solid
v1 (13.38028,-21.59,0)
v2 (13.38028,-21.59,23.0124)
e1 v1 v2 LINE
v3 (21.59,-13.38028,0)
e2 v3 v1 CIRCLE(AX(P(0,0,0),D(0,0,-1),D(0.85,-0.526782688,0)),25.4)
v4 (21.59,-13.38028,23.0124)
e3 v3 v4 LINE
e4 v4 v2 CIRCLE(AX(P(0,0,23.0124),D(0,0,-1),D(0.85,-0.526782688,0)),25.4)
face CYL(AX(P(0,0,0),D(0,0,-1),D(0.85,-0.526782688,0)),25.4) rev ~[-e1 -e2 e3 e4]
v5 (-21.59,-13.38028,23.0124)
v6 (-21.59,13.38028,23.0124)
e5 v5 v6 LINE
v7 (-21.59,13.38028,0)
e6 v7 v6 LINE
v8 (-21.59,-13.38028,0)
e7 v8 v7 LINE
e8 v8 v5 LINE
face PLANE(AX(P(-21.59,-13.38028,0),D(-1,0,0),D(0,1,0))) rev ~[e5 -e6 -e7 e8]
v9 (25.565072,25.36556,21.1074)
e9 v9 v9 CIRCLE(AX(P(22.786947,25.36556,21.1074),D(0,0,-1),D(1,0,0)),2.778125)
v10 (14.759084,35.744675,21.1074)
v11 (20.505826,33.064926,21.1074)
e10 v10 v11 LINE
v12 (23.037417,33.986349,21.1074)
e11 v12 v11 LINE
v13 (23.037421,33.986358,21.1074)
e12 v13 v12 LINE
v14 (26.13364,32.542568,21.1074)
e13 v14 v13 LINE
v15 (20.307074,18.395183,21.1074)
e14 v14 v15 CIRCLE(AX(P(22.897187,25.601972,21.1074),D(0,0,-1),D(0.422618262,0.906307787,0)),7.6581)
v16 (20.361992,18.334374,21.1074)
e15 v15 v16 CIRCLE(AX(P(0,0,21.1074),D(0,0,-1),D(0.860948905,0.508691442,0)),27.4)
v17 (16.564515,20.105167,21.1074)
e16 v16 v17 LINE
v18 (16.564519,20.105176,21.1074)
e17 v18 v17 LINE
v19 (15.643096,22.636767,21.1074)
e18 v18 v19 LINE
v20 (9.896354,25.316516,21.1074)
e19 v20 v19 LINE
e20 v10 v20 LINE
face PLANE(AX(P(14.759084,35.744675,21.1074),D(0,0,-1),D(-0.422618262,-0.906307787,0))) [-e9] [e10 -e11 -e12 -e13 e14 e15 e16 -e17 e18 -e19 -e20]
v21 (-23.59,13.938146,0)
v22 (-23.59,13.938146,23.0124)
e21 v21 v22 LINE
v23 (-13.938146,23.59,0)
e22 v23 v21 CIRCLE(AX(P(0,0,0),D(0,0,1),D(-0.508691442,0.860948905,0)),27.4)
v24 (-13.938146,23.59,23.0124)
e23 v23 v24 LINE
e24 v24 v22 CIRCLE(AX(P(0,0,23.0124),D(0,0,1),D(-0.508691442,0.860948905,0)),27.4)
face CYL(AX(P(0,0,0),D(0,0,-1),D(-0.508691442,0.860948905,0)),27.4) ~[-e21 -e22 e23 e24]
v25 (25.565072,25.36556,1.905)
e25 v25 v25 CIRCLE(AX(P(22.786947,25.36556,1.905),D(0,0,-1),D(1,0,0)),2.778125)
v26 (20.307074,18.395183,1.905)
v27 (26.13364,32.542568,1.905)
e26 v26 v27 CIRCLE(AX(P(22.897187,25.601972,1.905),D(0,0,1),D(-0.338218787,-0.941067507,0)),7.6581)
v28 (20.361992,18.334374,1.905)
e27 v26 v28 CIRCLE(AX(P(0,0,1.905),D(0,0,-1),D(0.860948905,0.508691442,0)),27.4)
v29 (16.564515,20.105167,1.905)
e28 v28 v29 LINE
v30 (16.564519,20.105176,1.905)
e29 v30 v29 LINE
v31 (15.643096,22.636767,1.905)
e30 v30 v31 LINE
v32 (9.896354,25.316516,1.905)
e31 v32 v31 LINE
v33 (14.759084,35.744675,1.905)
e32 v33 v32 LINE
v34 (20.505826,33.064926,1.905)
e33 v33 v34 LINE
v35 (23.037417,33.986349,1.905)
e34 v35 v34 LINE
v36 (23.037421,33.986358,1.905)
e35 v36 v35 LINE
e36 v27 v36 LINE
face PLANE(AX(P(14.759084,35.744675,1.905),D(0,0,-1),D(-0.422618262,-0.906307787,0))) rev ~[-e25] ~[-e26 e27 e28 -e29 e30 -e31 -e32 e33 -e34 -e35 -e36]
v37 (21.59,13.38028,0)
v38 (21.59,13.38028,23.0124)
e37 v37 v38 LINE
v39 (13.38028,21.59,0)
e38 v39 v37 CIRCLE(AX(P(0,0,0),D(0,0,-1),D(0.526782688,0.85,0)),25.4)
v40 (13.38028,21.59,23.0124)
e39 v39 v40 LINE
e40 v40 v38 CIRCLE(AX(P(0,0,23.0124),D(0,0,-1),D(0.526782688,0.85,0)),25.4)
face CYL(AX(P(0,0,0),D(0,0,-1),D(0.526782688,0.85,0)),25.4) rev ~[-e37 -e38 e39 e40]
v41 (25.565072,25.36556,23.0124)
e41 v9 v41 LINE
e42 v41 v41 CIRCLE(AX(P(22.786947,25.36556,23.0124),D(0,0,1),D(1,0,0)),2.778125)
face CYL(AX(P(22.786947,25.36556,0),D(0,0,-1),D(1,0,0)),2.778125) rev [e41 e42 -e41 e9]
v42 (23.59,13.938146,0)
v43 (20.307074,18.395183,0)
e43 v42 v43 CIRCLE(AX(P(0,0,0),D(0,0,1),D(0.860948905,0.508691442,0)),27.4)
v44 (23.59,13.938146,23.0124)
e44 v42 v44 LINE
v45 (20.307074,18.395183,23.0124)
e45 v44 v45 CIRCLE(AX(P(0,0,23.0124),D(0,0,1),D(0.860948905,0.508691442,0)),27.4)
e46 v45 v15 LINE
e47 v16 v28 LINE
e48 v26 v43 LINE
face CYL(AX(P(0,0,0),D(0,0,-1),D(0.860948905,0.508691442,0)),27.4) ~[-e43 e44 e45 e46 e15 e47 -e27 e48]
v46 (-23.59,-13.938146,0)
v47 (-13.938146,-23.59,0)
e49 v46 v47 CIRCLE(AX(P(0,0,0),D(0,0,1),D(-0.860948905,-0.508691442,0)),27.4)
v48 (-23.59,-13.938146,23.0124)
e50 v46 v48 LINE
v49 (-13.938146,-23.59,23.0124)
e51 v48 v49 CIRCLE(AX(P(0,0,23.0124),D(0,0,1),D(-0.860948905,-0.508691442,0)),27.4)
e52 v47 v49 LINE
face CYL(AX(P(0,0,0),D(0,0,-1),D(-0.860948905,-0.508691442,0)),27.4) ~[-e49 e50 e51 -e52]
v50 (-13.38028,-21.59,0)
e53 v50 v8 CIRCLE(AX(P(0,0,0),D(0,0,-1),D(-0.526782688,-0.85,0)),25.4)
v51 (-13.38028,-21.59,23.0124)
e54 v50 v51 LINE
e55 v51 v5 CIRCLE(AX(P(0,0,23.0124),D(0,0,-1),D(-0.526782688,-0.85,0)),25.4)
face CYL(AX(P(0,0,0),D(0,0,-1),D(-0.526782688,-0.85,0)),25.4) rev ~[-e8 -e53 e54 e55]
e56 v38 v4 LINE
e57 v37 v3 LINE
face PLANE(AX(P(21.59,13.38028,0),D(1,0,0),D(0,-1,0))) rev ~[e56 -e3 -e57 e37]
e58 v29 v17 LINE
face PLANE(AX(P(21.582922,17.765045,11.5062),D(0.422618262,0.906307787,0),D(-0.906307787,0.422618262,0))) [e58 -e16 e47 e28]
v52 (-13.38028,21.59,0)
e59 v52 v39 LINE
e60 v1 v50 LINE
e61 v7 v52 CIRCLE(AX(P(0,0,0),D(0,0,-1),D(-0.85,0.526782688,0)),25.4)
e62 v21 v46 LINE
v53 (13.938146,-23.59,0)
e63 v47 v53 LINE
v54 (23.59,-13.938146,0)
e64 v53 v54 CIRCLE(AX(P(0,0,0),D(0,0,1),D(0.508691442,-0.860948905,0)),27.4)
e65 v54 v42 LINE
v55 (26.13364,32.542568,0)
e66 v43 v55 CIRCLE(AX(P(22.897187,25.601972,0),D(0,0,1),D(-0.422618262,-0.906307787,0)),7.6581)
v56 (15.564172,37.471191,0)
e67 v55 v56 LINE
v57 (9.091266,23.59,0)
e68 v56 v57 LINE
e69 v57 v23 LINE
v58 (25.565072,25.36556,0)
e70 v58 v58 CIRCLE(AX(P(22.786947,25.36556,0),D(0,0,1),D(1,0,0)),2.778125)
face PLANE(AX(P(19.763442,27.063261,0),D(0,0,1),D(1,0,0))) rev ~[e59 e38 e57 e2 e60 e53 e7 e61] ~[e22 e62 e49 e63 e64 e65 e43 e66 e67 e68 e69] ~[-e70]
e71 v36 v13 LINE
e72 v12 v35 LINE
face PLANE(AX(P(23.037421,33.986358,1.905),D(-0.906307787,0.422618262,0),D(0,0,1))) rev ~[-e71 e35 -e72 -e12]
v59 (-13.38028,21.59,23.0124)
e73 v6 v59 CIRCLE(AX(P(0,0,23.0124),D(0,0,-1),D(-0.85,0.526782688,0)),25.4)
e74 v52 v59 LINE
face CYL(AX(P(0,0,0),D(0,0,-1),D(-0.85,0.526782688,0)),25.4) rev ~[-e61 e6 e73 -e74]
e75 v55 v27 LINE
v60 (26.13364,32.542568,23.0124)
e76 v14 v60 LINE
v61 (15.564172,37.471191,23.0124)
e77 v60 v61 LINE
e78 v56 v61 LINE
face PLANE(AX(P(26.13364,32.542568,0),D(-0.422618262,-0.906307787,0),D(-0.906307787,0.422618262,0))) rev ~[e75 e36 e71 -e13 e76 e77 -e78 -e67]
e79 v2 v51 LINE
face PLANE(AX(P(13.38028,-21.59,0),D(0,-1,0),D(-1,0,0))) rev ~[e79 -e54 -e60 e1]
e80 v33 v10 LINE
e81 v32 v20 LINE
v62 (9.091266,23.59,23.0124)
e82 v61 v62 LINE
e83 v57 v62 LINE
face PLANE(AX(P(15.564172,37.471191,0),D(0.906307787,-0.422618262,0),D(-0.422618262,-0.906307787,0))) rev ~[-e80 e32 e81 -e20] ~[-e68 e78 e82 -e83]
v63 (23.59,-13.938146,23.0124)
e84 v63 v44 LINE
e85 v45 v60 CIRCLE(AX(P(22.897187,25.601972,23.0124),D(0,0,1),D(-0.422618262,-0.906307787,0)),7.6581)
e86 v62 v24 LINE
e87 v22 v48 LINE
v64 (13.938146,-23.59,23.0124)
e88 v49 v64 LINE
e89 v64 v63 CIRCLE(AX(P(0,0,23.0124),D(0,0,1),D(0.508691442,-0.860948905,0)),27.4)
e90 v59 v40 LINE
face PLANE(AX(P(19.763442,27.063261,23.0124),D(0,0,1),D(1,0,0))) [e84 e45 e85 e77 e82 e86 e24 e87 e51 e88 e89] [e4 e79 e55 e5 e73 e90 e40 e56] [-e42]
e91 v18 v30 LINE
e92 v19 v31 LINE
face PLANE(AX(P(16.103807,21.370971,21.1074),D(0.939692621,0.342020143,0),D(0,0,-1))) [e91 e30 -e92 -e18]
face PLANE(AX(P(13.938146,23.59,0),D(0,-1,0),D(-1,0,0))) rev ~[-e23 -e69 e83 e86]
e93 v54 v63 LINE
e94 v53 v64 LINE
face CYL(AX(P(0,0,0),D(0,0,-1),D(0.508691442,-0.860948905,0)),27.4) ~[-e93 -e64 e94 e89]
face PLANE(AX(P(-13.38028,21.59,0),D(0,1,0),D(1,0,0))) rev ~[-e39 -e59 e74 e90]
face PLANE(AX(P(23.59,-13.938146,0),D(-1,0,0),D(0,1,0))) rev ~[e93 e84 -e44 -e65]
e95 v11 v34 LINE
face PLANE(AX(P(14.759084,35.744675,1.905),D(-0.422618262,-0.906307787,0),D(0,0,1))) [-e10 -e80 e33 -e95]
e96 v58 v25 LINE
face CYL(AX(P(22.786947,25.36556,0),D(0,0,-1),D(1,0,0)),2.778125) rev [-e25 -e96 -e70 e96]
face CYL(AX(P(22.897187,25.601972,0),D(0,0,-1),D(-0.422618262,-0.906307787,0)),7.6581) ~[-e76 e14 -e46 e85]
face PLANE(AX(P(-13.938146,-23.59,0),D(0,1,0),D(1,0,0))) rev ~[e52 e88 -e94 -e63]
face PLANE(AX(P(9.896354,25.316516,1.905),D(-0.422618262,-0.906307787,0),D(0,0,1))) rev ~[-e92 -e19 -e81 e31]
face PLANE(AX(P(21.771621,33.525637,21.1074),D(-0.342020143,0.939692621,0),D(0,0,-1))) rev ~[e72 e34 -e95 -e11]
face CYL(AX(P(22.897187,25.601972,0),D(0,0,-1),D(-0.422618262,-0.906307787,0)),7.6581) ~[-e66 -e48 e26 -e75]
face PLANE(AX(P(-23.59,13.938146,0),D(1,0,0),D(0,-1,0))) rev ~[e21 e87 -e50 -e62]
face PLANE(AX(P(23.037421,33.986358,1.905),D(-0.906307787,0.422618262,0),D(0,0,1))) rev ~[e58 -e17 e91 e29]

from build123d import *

# Parameters (mm, degrees)
F1_DEPTH = 23.0124
F2_R     = 2.778125
F3_DEPTH = 23.0124
F4_W     = 11.5062
F4_H     = 19.2024
F5_DEPTH = 39.3931387462
F6_W     = 11.0744
F6_H     = 19.2024
F7_DEPTH = 15.3162
F8_SIZE  = 1.90499


# Not quite as in the source:
# - a fillet or chamfer is up to 0.001 mm smaller than in the source, because OpenCascade refuses the exact size


with BuildPart() as f1:
    # F0 (on Top) → F1 (new body)
    with BuildSketch(Plane.XY):
        with BuildLine():
            Line((-13.9381455007, -23.59), (13.9381455007, -23.59))
            ThreePointArc((13.9381455007, -23.59), (19.3747258045, -19.3747258045), (23.59, -13.9381455007))
            Line((23.59, -13.9381455007), (23.59, 13.9381455007))
            ThreePointArc((23.59, 13.9381455007), (19.3747258045, 19.3747258045), (13.9381455007, 23.59))
            Line((13.9381455007, 23.59), (-13.9381455007, 23.59))
            ThreePointArc((-13.9381455007, 23.59), (-19.3747258045, 19.3747258045), (-23.59, 13.9381455007))
            Line((-23.59, 13.9381455007), (-23.59, -13.9381455007))
            ThreePointArc((-23.59, -13.9381455007), (-19.3747258045, -19.3747258045), (-13.9381455007, -23.59))
        make_face()
        with BuildLine():
            ThreePointArc((13.3802802661, 21.59), (17.9605122421, 17.9605122421), (21.59, 13.3802802661))
            Line((21.59, 13.3802802661), (21.59, -13.3802802661))
            ThreePointArc((21.59, -13.3802802661), (17.9605122421, -17.9605122421), (13.3802802661, -21.59))
            Line((13.3802802661, -21.59), (-13.3802802661, -21.59))
            ThreePointArc((-13.3802802661, -21.59), (-17.9605122421, -17.9605122421), (-21.59, -13.3802802661))
            Line((-21.59, -13.3802802661), (-21.59, 13.3802802661))
            ThreePointArc((-21.59, 13.3802802661), (-17.9605122421, 17.9605122421), (-13.3802802661, 21.59))
            Line((-13.3802802661, 21.59), (13.3802802661, 21.59))
        make_face(mode=Mode.SUBTRACT)
    extrude(amount=F1_DEPTH)

    # F2 (on Top) → F3 (join, through all)
    with BuildSketch(Plane.XY):
        with BuildLine():
            Line((15.5641722456, 37.4711913278), (9.0912664251, 23.59))
            Line((9.0912664251, 23.59), (19.6607342764, 18.6613761983))
            ThreePointArc((19.6607342764, 18.6613761983), (29.8377828505, 22.365518952), (26.1336400968, 32.5425675261))
            Line((26.1336400968, 32.5425675261), (15.5641722456, 37.4711913278))
        make_face()
        with Locations((22.7869465963, 25.3655601533)):
            Circle(F2_R, mode=Mode.SUBTRACT)
    extrude(amount=F3_DEPTH)

    # F4 (on face) → F5 (cut, through all)
    with BuildSketch(Plane(origin=(-1.5679842868, 0.7311630808, 0), x_dir=(-0.4226182617, -0.906307787, 0), z_dir=(-0.906307787, 0.4226182617, 0))):
        with Locations((-32.8800359098, 11.5062)):
            Rectangle(F4_W, F4_H)
    extrude(amount=-F5_DEPTH, mode=Mode.SUBTRACT)

    # F6 (on face) → F7 (cut)
    with BuildSketch(Plane(origin=(17.1321565324, 36.740028247, 0), x_dir=(-0.906307787, 0.4226182617, 0), z_dir=(0.4226182617, 0.906307787, 0))):
        with Locations((-12.0529382029, 11.5062)):
            Rectangle(F6_W, F6_H)
    extrude(amount=-F7_DEPTH, mode=Mode.SUBTRACT)

    # F8 (size 1.905 in the source; OpenCascade refuses exactly that, so slightly less here)
    f8_edges = [f1.edges().sort_by_distance(p)[0] for p in [
        (17.369603, 21.831683, 11.5062),
        (22.232333, 32.259842, 11.5062),
    ]]
    chamfer(f8_edges, length=F8_SIZE)


solid = f1.part
